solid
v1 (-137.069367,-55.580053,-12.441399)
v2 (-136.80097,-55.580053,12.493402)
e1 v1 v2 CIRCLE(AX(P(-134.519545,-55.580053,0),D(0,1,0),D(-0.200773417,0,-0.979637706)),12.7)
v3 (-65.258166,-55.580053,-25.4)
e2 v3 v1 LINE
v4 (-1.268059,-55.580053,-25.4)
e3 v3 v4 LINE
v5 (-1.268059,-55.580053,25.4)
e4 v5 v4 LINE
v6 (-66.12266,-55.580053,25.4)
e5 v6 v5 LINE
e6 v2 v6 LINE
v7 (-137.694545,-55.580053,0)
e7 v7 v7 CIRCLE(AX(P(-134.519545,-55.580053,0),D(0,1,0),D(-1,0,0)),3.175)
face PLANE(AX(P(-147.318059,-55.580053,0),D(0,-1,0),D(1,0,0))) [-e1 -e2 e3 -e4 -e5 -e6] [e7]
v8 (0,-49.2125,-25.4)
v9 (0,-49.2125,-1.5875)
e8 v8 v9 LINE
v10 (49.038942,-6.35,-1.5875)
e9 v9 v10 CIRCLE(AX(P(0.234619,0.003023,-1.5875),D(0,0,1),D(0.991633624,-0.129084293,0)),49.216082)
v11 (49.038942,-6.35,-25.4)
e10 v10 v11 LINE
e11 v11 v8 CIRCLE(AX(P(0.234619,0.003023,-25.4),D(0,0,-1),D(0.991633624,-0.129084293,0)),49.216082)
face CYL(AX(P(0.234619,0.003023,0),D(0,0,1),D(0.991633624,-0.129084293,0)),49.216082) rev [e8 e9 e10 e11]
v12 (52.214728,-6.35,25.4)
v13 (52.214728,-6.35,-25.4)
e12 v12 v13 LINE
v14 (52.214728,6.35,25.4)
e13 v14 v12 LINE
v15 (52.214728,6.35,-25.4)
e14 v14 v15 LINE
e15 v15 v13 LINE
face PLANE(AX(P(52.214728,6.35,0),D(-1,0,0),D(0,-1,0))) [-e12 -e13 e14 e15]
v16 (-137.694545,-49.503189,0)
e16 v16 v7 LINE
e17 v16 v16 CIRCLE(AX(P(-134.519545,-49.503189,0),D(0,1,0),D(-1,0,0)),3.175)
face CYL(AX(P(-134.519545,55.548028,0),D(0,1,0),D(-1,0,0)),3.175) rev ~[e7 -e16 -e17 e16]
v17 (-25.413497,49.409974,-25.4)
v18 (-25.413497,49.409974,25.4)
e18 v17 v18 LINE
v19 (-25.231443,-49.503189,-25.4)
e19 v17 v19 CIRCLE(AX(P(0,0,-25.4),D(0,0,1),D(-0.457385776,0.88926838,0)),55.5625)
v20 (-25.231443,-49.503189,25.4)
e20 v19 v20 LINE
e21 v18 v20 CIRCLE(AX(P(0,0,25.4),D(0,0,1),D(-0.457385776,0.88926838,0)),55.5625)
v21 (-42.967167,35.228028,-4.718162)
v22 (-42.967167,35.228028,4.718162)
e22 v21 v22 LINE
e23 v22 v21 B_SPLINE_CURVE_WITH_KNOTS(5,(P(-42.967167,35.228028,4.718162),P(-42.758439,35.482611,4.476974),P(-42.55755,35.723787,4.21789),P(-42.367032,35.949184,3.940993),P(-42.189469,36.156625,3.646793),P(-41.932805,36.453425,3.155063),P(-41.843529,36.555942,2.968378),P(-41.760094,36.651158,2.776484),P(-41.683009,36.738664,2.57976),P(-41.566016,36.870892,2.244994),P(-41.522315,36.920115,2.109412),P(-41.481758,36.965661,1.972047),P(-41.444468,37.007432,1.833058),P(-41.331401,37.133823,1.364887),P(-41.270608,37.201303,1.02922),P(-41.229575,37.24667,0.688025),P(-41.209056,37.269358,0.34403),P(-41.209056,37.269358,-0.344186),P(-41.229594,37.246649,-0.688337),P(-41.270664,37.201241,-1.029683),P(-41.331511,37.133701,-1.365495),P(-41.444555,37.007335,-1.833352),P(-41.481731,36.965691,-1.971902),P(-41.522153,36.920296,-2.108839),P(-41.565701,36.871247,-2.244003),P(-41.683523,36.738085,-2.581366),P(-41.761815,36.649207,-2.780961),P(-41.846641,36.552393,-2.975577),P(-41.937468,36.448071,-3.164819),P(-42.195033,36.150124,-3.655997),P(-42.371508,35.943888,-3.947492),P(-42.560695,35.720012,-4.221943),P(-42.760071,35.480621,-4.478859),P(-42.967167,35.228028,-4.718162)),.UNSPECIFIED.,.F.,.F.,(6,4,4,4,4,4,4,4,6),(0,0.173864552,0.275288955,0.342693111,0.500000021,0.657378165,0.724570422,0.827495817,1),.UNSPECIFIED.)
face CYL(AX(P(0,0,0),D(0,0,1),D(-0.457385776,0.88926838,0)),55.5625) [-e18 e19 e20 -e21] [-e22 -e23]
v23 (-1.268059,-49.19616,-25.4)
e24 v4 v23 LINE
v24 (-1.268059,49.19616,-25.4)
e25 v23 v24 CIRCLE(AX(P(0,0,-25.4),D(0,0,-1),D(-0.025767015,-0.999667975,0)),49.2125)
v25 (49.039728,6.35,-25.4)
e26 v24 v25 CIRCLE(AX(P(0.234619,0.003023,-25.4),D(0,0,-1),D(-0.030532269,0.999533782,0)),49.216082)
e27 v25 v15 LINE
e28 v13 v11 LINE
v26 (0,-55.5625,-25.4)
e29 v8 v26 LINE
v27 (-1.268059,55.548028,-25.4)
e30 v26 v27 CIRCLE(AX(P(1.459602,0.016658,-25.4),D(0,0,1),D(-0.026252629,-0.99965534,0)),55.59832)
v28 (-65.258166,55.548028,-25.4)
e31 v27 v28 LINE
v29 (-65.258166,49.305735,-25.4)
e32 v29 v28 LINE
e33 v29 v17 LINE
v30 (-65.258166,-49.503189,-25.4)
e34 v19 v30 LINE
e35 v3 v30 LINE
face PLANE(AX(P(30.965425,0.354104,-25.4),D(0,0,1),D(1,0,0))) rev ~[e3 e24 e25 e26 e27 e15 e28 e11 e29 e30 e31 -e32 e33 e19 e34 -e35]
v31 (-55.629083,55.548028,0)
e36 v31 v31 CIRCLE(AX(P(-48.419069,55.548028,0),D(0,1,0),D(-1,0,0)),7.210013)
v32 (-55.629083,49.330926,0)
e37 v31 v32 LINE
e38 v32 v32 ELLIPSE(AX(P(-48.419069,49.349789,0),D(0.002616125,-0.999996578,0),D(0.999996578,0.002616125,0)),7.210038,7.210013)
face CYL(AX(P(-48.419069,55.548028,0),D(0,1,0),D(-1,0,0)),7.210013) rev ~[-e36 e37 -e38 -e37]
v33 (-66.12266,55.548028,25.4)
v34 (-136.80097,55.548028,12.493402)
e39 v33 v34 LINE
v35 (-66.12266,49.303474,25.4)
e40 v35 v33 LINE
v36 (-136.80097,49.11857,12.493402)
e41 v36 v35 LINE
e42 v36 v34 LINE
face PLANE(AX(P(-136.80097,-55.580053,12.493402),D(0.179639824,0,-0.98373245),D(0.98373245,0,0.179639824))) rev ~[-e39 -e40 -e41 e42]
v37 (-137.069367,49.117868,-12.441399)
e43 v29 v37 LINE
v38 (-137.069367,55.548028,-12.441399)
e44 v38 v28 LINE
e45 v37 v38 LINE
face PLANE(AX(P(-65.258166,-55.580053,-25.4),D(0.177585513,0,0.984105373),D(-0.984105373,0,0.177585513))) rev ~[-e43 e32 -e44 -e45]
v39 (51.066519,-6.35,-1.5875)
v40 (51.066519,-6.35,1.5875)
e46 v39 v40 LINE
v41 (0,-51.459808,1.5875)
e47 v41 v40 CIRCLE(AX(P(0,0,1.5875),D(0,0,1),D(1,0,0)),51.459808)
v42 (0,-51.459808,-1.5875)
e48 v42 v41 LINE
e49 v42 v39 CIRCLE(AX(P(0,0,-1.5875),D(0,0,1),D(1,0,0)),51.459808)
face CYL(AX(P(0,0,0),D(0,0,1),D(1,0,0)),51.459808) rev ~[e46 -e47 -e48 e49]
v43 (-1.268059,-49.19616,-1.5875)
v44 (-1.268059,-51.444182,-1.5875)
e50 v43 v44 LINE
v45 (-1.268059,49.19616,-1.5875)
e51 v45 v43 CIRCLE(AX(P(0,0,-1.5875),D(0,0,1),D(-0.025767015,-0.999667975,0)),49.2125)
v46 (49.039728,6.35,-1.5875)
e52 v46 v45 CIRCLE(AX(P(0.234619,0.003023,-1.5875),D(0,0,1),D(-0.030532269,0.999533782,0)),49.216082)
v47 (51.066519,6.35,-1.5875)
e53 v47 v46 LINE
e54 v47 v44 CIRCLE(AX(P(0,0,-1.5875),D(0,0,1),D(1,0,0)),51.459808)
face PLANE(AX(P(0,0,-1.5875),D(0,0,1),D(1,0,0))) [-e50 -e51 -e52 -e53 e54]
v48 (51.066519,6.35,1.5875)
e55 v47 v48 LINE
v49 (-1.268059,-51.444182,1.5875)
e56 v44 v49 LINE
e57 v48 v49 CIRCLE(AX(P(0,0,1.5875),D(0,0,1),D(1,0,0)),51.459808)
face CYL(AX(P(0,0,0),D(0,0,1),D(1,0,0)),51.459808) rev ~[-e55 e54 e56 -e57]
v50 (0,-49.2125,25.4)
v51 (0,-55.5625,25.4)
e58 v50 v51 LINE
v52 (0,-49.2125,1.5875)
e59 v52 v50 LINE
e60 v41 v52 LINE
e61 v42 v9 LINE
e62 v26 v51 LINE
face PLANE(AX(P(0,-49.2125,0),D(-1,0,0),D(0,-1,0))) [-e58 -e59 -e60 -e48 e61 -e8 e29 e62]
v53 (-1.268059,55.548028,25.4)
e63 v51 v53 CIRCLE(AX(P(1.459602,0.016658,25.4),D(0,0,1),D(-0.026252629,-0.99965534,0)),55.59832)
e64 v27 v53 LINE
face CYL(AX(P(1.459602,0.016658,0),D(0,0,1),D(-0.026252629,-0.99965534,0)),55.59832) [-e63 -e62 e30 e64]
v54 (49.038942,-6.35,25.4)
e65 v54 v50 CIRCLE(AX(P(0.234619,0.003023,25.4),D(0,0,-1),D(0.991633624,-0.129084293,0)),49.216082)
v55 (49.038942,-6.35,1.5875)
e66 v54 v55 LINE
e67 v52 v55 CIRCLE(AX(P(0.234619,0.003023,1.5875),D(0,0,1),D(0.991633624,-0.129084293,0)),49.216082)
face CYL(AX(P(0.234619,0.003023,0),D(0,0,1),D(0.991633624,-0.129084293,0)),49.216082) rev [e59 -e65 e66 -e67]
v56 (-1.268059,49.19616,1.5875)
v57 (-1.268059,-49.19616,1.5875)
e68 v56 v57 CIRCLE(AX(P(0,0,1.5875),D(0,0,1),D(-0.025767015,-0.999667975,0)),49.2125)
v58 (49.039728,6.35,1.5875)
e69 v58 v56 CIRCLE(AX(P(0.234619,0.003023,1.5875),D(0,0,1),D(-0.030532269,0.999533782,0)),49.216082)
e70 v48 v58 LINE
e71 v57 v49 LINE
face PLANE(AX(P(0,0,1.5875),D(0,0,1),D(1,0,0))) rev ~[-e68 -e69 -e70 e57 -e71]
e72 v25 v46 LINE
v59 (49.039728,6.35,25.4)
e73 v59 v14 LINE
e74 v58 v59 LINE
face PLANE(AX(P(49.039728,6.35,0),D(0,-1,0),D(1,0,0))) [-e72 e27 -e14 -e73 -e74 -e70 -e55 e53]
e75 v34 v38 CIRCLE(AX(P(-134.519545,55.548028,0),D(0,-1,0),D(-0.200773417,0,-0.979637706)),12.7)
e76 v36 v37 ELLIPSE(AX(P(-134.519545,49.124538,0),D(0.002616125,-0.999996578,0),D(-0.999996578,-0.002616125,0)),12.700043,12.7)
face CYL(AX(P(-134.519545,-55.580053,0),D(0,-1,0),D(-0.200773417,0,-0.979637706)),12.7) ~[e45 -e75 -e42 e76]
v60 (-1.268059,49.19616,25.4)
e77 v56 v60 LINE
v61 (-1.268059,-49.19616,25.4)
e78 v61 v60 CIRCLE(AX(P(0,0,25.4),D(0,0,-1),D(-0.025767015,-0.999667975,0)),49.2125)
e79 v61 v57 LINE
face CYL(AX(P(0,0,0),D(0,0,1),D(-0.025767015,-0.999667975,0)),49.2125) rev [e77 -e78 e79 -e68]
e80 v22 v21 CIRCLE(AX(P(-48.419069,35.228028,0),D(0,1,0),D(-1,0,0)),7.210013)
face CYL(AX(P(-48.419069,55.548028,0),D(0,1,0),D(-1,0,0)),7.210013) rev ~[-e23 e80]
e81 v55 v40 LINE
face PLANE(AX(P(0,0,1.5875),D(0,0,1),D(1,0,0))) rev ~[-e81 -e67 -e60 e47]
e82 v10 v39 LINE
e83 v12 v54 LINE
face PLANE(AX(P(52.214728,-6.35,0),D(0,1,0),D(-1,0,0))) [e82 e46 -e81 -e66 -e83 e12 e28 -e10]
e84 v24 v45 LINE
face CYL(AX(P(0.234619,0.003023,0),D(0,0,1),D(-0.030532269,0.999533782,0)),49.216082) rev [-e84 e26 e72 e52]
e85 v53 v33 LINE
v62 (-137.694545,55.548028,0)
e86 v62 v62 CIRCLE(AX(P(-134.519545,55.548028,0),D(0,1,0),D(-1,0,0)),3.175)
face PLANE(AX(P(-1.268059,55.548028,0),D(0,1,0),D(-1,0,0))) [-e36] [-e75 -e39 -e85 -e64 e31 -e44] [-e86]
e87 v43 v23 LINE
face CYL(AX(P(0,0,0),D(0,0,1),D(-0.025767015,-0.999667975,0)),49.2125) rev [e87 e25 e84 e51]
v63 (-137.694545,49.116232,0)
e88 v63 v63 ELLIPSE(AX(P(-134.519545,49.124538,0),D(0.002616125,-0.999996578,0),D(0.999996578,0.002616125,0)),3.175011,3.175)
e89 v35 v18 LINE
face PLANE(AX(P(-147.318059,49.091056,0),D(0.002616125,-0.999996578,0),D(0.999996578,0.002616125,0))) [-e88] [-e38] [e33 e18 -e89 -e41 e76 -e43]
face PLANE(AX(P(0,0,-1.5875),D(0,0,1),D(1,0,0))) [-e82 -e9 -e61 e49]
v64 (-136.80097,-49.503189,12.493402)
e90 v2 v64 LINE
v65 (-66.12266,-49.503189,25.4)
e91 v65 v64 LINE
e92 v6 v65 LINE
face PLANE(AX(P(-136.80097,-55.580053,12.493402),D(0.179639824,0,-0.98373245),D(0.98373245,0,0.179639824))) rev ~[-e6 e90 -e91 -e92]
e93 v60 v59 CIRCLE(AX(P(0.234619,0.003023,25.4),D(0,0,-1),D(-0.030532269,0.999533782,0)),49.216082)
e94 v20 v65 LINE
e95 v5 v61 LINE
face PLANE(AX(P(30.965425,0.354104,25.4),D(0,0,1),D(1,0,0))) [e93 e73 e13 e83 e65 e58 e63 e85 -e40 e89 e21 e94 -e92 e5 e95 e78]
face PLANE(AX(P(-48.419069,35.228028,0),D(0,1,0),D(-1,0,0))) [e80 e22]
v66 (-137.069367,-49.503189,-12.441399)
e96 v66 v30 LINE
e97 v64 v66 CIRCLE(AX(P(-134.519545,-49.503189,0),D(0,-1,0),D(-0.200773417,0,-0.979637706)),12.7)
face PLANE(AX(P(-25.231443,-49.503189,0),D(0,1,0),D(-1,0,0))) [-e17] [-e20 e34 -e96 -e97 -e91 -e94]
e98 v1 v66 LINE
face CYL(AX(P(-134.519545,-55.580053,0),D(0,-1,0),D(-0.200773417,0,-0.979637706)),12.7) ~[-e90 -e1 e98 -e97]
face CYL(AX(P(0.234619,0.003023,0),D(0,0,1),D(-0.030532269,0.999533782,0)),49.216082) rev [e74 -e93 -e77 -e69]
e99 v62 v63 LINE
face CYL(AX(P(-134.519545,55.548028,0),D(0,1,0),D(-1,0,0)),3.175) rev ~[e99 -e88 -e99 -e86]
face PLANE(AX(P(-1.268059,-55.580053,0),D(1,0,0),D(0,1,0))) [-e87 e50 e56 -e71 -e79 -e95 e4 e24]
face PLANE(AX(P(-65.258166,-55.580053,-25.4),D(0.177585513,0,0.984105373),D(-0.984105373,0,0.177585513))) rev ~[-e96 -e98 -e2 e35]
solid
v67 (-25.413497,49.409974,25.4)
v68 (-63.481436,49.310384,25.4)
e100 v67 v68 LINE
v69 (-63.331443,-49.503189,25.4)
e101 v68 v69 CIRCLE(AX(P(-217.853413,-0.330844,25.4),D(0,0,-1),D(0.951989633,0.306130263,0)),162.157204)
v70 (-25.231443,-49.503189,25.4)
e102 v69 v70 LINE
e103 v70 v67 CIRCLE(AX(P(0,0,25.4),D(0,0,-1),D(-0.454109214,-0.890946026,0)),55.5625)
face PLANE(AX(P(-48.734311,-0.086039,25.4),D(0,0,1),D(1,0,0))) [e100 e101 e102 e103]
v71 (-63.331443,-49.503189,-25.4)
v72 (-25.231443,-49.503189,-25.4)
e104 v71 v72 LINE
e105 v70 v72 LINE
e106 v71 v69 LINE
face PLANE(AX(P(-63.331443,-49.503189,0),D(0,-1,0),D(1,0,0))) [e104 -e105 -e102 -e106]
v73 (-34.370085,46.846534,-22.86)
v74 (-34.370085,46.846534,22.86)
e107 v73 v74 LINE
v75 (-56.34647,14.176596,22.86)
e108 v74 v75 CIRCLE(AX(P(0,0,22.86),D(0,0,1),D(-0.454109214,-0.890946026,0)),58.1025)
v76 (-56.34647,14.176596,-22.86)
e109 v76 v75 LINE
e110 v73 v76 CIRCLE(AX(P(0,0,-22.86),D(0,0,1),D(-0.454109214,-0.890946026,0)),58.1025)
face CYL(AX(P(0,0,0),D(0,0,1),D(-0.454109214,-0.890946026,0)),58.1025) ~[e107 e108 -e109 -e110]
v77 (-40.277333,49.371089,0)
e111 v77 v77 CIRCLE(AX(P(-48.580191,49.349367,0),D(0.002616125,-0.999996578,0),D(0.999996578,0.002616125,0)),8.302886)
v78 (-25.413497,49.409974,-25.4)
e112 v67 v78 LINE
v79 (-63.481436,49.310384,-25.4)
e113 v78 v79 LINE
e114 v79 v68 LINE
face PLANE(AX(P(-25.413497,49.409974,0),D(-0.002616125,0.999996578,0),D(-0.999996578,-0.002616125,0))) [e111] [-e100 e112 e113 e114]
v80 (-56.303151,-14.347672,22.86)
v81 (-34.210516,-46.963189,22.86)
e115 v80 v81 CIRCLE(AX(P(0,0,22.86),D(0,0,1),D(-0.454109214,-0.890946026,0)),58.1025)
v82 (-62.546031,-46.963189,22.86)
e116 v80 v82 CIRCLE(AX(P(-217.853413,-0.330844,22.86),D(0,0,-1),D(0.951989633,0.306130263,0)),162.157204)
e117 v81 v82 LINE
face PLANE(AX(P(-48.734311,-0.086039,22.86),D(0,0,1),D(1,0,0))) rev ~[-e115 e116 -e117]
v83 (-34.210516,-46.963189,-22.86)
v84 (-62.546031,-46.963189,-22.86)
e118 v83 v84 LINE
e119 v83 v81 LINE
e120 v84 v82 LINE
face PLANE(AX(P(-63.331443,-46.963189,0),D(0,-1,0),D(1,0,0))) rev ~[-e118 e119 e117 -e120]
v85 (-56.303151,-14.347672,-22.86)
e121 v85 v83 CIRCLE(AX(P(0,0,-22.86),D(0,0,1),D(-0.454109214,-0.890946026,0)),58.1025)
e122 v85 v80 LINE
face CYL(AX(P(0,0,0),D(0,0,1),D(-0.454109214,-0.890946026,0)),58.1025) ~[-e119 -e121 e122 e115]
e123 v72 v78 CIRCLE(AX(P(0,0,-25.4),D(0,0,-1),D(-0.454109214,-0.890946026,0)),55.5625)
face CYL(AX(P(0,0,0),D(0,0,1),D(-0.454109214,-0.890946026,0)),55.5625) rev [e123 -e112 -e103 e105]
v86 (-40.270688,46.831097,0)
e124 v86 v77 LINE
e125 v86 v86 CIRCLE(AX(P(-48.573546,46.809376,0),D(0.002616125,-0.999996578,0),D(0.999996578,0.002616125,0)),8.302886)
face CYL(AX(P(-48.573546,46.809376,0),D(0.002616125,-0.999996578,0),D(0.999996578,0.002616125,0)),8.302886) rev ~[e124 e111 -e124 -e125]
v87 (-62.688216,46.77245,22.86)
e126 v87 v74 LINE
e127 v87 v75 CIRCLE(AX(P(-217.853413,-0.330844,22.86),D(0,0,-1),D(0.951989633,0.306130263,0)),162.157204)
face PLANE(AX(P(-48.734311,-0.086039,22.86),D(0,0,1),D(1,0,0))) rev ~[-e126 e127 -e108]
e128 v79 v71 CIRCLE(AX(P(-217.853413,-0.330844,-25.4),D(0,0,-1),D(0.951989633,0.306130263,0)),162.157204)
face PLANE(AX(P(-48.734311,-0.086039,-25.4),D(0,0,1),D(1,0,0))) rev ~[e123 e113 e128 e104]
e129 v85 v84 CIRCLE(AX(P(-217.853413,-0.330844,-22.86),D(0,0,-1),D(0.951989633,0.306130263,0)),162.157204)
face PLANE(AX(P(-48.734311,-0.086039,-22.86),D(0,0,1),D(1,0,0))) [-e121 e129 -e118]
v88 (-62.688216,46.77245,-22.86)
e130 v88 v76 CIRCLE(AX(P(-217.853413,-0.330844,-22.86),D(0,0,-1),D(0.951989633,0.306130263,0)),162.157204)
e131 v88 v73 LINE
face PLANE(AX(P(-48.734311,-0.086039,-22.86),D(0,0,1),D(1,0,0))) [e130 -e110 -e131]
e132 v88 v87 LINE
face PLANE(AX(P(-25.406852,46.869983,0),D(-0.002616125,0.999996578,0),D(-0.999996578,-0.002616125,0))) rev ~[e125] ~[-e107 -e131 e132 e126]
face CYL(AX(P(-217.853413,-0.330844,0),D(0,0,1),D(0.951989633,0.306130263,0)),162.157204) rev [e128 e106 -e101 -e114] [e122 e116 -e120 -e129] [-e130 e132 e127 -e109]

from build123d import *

# Parameters (mm, degrees)
F1_DEPTH  = 25.4
F3_DEPTH  = 25.4
F4_DEPTH  = 25.4
F7_DEPTH  = 120.65
F8_R      = 3.175
F9_DEPTH  = 114.3
F10_R     = 51.4598077904
F11_DEPTH = 1.5875
F12_T     = 2.54
F13_R     = 7.2100131565
F14_DEPTH = 20.32
F15_R     = 8.3028862555
F16_DEPTH = 17.78


# Not quite as in the source:
# - a shell that OpenCascade refuses in one call is made with other operations: the cavity is built on its own and cut out
# - the program builds the solid bodies; features that only make, move or delete a surface that nothing else refers to are left out


with BuildPart() as f1:
    # F0 (on Top) → F1 (new body, symmetric)
    with BuildSketch(Plane.XY):
        with BuildLine():
            ThreePointArc((-1.2680592233, -49.1961602369), (-49.2125, 0), (-1.2680592233, 49.1961602369))
            Line((-1.2680592233, 49.1961602369), (-1.2680592233, 55.5480281563))
            Line((-1.2680592233, 55.5480281563), (-147.3180592233, 55.5480281563))
            Line((-147.3180592233, 55.5480281563), (-147.3180592233, 49.091055685))
            Line((-147.3180592233, 49.091055685), (-63.4814364191, 49.3103835326))
            Line((-63.4814364191, 49.3103835326), (-25.4134971885, 49.4099743665))
            ThreePointArc((-25.4134971885, 49.4099743665), (-55.5624058885, -0.1022650226), (-25.2314432137, -49.5031885802))
            Line((-25.2314432137, -49.5031885802), (-63.3314432137, -49.5031885802))
            Line((-63.3314432137, -49.5031885802), (-69.6814432137, -49.5031885802))
            Line((-69.6814432137, -49.5031885802), (-147.3180592233, -49.5031885802))
            Line((-147.3180592233, -49.5031885802), (-147.3180592233, -55.5800534785))
            Line((-147.3180592233, -55.5800534785), (-1.2680592233, -55.5800534785))
            Line((-1.2680592233, -55.5800534785), (-1.2680592233, -49.1961602369))
        make_face()
    extrude(amount=F1_DEPTH, both=True)

    # F0 (on Top) → F4 (join, symmetric)
    with BuildSketch(Plane.XY):
        with BuildLine():
            ThreePointArc((49.0389416617, -6.35), (32.6236991353, -37.0532891725), (0, -49.2125))
            Line((0, -49.2125), (0, -55.5625))
            ThreePointArc((0, -55.5625), (57.0543020001, 0.6511375212), (-1.2680592233, 55.5480281563))
            Line((-1.2680592233, 55.5480281563), (-1.2680592233, 49.1961602369))
            ThreePointArc((-1.2680592233, 49.1961602369), (32.1458766832, 37.4716025001), (49.0397283671, 6.35))
            Line((49.0397283671, 6.35), (52.2147283671, 6.35))
            Line((52.2147283671, 6.35), (52.2147283671, -6.35))
            Line((52.2147283671, -6.35), (49.0389416617, -6.35))
        make_face()
    extrude(amount=F4_DEPTH, both=True)

    # F6 (on face) → F7 (cut)
    with BuildSketch(Plane.XZ.offset(55.5800534785)):
        with BuildLine():
            ThreePointArc((-137.0693669386, -12.441398865), (-147.2188088745, 0.1366940896), (-136.8009702954, 12.493402119))
            Line((-136.8009702954, 12.493402119), (-66.122660171, 25.4))
            Line((-66.122660171, 25.4), (-147.3180592233, 25.4))
            Line((-147.3180592233, 25.4), (-147.3180592233, -25.4))
            Line((-147.3180592233, -25.4), (-65.2581656686, -25.4))
            Line((-65.2581656686, -25.4), (-137.0693669386, -12.441398865))
        make_face()
    extrude(amount=-F7_DEPTH, mode=Mode.SUBTRACT)

    # F8 (on face) → F9 (cut)
    with BuildSketch(Plane(origin=(0, 55.5480281563, 0), x_dir=(-1, 0, 0), z_dir=(0, 1, 0))):
        with Locations((134.5195445365, 0)):
            Circle(F8_R)
    extrude(amount=-F9_DEPTH, mode=Mode.SUBTRACT)

    # F10 (on Top) → F11 (cut, symmetric)
    with BuildSketch(Plane.XY):
        Circle(F10_R)
    extrude(amount=F11_DEPTH, both=True, mode=Mode.SUBTRACT)

    # F13 (on face) → F14 (cut)
    with BuildSketch(Plane(origin=(0, 55.5480281563, 0), x_dir=(-1, 0, 0), z_dir=(0, 1, 0))):
        with Locations((48.4190694988, 0)):
            Circle(F13_R)
    extrude(amount=-F14_DEPTH, mode=Mode.SUBTRACT)


with BuildPart() as f3:
    # F0 (on Top) → F3 (new body, symmetric)
    with BuildSketch(Plane.XY):
        with BuildLine():
            Line((-25.4134971885, 49.4099743665), (-63.4814364191, 49.3103835326))
            ThreePointArc((-63.4814364191, 49.3103835326), (-55.6963964132, -0.0846991302), (-63.3314432137, -49.5031885802))
            Line((-63.3314432137, -49.5031885802), (-25.2314432137, -49.5031885802))
            ThreePointArc((-25.2314432137, -49.5031885802), (-55.5624058885, -0.1022650226), (-25.4134971885, 49.4099743665))
        make_face()
    extrude(amount=F3_DEPTH, both=True)

    # F12: shell of thickness 2.54, made by hand


with BuildPart() as f12_core1:
    # F12_t2: copy of F3
    add(f3.part)

    # the walls: a layer under each face that stays
    f12_faces = [f12_core1.faces().sort_by_distance(p)[0] for p in [
        (-44.2814432137, -49.5031885802, 0),
        (-44.4474668038, 49.3601789496, 0),
        (-57.1064375515, -33.0176614224, 25.4),
        (-55.5624058885, -0.1022650226, 0),
        (-57.1064375515, -33.0176614224, -25.4),
    ]]
    thicken(f12_faces, amount=-F12_T, mode=Mode.SUBTRACT)


with BuildPart() as f3_1:
    add(f3.part)

    # what is left inside the walls is the cavity
    f12_cavity = [f12_core1.part.solids().sort_by_distance(p)[0] for p in [
        (-48.126372, -32.599157, -7.62),
        (-48.23108, 32.444039, -7.62),
    ]]
    add(f12_cavity, mode=Mode.SUBTRACT)

    # F15 (on face) → F16 (cut)
    with BuildSketch(Plane(origin=(-0.122791209, 46.9361295528, 0), x_dir=(0.9999965779, 0.0026161251, 0), z_dir=(0.0026161251, -0.9999965779, 0))):
        with Locations((-48.4509207308, 0)):
            Circle(F15_R)
    extrude(amount=-F16_DEPTH, mode=Mode.SUBTRACT)


solid = Compound([f1.part, f3_1.part])
